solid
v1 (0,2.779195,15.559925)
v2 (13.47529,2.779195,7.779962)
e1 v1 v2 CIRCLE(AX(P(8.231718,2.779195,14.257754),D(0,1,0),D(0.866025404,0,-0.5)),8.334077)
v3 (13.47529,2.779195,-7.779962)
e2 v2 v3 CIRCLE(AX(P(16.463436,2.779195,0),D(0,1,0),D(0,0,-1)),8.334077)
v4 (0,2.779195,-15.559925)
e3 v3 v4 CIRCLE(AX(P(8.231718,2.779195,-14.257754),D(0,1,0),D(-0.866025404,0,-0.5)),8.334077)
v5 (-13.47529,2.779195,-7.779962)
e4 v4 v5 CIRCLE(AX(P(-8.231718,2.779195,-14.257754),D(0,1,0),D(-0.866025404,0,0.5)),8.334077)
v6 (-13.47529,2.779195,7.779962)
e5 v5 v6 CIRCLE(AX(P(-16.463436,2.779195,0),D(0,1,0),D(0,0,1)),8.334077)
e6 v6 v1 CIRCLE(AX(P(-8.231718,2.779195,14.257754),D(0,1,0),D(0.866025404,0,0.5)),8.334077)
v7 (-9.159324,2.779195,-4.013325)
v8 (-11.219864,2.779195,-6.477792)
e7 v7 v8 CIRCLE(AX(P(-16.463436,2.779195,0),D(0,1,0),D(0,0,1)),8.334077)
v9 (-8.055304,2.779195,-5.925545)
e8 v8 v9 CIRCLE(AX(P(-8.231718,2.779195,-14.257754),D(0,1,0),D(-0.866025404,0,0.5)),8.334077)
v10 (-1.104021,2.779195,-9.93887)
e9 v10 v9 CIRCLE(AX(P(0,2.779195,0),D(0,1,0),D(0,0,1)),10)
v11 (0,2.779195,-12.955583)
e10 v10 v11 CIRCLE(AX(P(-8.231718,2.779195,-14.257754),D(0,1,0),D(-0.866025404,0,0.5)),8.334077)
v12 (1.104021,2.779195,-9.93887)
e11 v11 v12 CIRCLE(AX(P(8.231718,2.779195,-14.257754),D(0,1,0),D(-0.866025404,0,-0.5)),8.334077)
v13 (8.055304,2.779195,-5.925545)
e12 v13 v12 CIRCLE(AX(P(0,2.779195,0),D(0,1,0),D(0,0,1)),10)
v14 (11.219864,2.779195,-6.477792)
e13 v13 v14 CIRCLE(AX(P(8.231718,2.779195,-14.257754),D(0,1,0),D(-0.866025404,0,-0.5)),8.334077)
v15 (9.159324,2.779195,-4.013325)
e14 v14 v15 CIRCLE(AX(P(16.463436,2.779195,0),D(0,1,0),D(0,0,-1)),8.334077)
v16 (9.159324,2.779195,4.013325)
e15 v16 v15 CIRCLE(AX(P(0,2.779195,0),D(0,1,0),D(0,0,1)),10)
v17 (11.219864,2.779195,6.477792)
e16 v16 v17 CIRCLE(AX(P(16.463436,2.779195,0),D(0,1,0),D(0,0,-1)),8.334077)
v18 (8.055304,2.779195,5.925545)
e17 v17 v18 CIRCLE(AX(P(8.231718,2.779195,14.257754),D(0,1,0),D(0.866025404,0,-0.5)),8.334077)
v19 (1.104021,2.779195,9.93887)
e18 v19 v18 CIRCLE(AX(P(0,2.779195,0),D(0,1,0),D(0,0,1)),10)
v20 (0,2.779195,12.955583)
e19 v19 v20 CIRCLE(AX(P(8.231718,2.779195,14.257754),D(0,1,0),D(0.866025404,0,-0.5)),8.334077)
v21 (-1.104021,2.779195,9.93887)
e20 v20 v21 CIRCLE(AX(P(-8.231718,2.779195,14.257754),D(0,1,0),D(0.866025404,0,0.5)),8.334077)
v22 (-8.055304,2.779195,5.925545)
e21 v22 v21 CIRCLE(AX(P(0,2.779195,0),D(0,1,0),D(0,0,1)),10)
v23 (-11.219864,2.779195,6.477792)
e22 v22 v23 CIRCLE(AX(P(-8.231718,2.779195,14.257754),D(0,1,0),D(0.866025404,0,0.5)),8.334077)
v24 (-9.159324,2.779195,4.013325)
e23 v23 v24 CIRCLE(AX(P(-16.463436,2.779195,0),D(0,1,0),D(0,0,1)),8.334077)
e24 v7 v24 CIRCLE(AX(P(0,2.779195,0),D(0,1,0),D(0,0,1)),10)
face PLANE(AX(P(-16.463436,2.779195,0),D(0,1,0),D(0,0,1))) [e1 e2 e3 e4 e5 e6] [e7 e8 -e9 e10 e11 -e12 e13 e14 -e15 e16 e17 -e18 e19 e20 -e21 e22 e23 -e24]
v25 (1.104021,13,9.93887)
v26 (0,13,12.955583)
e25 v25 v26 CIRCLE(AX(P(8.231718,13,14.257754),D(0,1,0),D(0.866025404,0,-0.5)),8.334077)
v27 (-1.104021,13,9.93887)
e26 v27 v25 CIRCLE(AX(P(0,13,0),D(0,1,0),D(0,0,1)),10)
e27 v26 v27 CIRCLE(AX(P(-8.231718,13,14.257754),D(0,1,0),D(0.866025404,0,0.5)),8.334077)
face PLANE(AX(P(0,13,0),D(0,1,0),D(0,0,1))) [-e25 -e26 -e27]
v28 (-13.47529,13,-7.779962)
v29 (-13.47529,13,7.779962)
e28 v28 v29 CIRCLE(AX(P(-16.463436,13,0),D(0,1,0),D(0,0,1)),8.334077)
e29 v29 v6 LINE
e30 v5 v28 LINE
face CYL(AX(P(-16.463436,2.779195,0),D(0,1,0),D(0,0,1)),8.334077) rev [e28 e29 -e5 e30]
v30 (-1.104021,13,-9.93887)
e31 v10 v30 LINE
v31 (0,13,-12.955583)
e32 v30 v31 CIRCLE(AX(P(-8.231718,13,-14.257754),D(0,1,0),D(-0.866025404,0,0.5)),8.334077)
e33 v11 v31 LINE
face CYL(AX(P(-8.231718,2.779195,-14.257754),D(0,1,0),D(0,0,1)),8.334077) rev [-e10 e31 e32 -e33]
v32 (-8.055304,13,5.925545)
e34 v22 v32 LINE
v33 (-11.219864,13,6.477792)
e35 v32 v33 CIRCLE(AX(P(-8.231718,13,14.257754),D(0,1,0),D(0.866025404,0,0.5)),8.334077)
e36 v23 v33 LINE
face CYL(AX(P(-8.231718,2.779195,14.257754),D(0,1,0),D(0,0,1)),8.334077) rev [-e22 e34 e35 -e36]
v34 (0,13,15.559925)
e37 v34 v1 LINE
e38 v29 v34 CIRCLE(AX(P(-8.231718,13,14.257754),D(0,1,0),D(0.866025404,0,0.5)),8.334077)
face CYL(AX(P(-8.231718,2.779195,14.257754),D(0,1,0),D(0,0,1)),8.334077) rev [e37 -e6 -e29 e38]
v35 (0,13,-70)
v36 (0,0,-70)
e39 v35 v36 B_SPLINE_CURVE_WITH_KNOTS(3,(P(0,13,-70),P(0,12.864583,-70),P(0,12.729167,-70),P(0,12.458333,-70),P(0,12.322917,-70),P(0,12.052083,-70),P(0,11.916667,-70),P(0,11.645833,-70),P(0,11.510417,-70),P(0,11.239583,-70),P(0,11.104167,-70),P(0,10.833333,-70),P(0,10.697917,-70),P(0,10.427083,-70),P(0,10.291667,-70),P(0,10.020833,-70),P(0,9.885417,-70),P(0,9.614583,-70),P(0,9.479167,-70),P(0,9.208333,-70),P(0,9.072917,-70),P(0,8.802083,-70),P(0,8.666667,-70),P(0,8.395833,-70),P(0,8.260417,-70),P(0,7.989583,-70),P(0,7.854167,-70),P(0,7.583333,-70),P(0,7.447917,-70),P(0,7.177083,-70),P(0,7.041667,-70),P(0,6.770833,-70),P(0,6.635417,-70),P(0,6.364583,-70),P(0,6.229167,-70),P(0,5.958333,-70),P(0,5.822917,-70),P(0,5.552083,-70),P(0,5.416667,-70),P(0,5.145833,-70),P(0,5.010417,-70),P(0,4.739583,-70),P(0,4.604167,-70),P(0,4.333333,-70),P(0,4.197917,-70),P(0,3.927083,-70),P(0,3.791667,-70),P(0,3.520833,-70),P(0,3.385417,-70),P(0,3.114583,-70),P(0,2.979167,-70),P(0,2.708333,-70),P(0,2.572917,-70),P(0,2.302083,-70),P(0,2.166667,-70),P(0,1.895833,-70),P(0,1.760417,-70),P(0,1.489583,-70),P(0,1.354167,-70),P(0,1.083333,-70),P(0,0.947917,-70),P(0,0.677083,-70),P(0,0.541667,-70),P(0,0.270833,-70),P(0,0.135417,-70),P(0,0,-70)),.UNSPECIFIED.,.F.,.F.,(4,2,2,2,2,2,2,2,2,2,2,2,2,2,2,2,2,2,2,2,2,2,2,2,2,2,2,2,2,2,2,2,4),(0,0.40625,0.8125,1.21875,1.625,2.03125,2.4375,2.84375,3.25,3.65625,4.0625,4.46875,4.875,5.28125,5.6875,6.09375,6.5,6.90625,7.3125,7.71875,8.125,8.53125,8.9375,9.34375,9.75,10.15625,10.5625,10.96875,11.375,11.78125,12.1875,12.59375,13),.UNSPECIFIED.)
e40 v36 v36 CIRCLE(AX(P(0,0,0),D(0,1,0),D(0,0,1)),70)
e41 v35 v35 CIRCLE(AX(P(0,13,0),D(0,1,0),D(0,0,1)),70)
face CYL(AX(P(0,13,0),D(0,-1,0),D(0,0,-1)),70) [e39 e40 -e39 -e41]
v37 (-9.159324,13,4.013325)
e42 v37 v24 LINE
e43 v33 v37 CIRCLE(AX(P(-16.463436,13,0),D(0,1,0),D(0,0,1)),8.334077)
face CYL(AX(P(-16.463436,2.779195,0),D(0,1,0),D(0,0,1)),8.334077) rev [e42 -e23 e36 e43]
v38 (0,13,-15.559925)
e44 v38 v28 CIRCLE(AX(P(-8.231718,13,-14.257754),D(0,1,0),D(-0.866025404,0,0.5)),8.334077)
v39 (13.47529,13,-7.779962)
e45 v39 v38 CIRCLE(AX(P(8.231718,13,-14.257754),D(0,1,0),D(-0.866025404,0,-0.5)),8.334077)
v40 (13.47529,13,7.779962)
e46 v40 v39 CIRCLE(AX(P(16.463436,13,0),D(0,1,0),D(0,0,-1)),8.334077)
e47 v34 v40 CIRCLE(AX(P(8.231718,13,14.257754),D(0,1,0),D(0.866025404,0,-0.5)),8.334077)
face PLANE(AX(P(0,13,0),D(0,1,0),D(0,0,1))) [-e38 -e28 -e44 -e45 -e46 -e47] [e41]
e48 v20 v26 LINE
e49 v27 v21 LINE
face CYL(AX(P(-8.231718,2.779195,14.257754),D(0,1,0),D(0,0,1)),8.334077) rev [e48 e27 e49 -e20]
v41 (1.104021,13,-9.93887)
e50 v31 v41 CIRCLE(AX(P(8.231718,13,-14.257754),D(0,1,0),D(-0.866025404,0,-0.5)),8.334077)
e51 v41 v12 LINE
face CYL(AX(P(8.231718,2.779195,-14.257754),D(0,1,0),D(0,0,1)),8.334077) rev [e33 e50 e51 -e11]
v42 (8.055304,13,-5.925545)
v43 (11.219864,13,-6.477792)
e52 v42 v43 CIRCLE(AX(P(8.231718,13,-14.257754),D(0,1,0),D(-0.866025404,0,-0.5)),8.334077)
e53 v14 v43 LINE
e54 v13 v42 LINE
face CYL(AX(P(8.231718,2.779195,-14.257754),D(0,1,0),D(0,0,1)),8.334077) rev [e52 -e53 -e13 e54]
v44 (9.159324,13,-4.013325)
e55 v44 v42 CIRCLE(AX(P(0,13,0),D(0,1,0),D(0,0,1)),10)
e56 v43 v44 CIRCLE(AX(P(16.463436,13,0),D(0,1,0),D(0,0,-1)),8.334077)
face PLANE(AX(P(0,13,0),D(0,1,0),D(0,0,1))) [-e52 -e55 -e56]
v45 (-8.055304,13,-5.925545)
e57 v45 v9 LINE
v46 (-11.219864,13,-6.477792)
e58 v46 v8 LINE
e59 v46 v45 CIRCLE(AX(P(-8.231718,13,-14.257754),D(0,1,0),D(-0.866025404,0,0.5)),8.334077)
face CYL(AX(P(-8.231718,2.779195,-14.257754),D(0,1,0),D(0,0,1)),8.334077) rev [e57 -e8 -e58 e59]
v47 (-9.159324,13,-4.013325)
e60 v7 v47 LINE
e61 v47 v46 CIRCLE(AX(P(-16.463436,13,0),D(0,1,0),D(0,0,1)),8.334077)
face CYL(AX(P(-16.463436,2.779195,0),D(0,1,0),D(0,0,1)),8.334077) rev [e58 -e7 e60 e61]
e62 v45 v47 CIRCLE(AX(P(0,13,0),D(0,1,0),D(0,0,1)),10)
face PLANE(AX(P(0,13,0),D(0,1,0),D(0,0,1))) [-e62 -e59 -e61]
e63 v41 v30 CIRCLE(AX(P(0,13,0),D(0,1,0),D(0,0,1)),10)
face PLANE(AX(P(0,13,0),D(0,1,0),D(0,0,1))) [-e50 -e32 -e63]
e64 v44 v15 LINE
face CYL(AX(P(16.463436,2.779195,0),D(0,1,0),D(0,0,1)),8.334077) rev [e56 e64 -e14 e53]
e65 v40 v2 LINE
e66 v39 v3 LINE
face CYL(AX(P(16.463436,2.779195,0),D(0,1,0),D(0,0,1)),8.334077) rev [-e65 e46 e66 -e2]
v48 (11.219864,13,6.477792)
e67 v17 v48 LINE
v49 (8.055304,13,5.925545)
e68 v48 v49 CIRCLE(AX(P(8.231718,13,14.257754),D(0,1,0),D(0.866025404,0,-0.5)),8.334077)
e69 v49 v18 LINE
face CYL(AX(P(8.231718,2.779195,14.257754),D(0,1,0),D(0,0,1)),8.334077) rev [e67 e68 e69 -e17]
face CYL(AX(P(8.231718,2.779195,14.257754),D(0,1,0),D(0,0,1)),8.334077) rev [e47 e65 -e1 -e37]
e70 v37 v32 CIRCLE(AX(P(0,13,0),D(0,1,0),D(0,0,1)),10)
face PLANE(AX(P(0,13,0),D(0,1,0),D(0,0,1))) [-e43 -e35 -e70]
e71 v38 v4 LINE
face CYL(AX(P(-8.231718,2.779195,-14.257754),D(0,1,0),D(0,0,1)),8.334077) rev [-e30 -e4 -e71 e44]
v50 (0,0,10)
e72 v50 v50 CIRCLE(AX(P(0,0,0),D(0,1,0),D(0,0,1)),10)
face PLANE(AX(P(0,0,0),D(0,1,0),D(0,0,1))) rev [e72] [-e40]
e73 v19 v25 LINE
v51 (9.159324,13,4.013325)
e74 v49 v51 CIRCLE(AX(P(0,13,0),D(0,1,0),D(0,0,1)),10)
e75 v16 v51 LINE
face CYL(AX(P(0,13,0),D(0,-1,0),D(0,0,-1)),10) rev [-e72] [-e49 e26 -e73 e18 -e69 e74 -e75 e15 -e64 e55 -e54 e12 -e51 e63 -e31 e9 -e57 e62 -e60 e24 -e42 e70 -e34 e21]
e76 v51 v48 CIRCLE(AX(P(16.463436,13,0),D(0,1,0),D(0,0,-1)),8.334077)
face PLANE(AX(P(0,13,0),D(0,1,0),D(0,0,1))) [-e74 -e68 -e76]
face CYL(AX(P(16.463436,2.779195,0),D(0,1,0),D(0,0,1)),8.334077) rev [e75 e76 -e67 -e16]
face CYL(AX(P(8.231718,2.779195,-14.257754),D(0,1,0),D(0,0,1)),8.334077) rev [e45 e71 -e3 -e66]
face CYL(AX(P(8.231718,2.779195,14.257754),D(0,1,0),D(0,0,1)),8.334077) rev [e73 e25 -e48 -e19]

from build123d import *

# Parameters (mm, degrees)
SKETCH1_R           = 70
BOSS_EXTRUDE1_DEPTH = 13
SKETCH2_R           = 10
CUT_EXTRUDE1_DEPTH  = 100.844879688
SKETCH3_R           = 8.334076576
CUT_EXTRUDE2_DEPTH  = 10.220804832
CIRPATTERN1_COUNT   = 6


with BuildPart() as part:
    # Sketch1 → Boss-Extrude1 (new body)
    with BuildSketch(Plane(origin=(0, 0, 0), x_dir=(1, 0, 0), z_dir=(0, 1, 0))):
        Circle(SKETCH1_R)
    extrude(amount=BOSS_EXTRUDE1_DEPTH)

    # Sketch2 → Cut-Extrude1 (cut, through all)
    with BuildSketch(Plane(origin=(0, 0, 0), x_dir=(1, 0, 0), z_dir=(0, 1, 0))):
        Circle(SKETCH2_R)
    extrude(amount=CUT_EXTRUDE1_DEPTH, mode=Mode.SUBTRACT)

    # Sketch3 → Cut-Extrude2 (cut)
    with BuildSketch(Plane(origin=(0, 13, 0), x_dir=(1, 0, 0), z_dir=(0, 1, 0))):
        with Locations((-16.463436294, 0)):
            Circle(SKETCH3_R)
    cut_extrude2 = extrude(amount=-CUT_EXTRUDE2_DEPTH, mode=Mode.SUBTRACT)

    # CirPattern1: Cut-Extrude2 ×6 about axis
    cirpattern1_axis = Axis((0, 0, 0), (0, 1, 0))
    for i in range(1, CIRPATTERN1_COUNT):
        add(cut_extrude2.rotate(cirpattern1_axis, i * 360 / CIRPATTERN1_COUNT), mode=Mode.SUBTRACT)


solid = part.part
